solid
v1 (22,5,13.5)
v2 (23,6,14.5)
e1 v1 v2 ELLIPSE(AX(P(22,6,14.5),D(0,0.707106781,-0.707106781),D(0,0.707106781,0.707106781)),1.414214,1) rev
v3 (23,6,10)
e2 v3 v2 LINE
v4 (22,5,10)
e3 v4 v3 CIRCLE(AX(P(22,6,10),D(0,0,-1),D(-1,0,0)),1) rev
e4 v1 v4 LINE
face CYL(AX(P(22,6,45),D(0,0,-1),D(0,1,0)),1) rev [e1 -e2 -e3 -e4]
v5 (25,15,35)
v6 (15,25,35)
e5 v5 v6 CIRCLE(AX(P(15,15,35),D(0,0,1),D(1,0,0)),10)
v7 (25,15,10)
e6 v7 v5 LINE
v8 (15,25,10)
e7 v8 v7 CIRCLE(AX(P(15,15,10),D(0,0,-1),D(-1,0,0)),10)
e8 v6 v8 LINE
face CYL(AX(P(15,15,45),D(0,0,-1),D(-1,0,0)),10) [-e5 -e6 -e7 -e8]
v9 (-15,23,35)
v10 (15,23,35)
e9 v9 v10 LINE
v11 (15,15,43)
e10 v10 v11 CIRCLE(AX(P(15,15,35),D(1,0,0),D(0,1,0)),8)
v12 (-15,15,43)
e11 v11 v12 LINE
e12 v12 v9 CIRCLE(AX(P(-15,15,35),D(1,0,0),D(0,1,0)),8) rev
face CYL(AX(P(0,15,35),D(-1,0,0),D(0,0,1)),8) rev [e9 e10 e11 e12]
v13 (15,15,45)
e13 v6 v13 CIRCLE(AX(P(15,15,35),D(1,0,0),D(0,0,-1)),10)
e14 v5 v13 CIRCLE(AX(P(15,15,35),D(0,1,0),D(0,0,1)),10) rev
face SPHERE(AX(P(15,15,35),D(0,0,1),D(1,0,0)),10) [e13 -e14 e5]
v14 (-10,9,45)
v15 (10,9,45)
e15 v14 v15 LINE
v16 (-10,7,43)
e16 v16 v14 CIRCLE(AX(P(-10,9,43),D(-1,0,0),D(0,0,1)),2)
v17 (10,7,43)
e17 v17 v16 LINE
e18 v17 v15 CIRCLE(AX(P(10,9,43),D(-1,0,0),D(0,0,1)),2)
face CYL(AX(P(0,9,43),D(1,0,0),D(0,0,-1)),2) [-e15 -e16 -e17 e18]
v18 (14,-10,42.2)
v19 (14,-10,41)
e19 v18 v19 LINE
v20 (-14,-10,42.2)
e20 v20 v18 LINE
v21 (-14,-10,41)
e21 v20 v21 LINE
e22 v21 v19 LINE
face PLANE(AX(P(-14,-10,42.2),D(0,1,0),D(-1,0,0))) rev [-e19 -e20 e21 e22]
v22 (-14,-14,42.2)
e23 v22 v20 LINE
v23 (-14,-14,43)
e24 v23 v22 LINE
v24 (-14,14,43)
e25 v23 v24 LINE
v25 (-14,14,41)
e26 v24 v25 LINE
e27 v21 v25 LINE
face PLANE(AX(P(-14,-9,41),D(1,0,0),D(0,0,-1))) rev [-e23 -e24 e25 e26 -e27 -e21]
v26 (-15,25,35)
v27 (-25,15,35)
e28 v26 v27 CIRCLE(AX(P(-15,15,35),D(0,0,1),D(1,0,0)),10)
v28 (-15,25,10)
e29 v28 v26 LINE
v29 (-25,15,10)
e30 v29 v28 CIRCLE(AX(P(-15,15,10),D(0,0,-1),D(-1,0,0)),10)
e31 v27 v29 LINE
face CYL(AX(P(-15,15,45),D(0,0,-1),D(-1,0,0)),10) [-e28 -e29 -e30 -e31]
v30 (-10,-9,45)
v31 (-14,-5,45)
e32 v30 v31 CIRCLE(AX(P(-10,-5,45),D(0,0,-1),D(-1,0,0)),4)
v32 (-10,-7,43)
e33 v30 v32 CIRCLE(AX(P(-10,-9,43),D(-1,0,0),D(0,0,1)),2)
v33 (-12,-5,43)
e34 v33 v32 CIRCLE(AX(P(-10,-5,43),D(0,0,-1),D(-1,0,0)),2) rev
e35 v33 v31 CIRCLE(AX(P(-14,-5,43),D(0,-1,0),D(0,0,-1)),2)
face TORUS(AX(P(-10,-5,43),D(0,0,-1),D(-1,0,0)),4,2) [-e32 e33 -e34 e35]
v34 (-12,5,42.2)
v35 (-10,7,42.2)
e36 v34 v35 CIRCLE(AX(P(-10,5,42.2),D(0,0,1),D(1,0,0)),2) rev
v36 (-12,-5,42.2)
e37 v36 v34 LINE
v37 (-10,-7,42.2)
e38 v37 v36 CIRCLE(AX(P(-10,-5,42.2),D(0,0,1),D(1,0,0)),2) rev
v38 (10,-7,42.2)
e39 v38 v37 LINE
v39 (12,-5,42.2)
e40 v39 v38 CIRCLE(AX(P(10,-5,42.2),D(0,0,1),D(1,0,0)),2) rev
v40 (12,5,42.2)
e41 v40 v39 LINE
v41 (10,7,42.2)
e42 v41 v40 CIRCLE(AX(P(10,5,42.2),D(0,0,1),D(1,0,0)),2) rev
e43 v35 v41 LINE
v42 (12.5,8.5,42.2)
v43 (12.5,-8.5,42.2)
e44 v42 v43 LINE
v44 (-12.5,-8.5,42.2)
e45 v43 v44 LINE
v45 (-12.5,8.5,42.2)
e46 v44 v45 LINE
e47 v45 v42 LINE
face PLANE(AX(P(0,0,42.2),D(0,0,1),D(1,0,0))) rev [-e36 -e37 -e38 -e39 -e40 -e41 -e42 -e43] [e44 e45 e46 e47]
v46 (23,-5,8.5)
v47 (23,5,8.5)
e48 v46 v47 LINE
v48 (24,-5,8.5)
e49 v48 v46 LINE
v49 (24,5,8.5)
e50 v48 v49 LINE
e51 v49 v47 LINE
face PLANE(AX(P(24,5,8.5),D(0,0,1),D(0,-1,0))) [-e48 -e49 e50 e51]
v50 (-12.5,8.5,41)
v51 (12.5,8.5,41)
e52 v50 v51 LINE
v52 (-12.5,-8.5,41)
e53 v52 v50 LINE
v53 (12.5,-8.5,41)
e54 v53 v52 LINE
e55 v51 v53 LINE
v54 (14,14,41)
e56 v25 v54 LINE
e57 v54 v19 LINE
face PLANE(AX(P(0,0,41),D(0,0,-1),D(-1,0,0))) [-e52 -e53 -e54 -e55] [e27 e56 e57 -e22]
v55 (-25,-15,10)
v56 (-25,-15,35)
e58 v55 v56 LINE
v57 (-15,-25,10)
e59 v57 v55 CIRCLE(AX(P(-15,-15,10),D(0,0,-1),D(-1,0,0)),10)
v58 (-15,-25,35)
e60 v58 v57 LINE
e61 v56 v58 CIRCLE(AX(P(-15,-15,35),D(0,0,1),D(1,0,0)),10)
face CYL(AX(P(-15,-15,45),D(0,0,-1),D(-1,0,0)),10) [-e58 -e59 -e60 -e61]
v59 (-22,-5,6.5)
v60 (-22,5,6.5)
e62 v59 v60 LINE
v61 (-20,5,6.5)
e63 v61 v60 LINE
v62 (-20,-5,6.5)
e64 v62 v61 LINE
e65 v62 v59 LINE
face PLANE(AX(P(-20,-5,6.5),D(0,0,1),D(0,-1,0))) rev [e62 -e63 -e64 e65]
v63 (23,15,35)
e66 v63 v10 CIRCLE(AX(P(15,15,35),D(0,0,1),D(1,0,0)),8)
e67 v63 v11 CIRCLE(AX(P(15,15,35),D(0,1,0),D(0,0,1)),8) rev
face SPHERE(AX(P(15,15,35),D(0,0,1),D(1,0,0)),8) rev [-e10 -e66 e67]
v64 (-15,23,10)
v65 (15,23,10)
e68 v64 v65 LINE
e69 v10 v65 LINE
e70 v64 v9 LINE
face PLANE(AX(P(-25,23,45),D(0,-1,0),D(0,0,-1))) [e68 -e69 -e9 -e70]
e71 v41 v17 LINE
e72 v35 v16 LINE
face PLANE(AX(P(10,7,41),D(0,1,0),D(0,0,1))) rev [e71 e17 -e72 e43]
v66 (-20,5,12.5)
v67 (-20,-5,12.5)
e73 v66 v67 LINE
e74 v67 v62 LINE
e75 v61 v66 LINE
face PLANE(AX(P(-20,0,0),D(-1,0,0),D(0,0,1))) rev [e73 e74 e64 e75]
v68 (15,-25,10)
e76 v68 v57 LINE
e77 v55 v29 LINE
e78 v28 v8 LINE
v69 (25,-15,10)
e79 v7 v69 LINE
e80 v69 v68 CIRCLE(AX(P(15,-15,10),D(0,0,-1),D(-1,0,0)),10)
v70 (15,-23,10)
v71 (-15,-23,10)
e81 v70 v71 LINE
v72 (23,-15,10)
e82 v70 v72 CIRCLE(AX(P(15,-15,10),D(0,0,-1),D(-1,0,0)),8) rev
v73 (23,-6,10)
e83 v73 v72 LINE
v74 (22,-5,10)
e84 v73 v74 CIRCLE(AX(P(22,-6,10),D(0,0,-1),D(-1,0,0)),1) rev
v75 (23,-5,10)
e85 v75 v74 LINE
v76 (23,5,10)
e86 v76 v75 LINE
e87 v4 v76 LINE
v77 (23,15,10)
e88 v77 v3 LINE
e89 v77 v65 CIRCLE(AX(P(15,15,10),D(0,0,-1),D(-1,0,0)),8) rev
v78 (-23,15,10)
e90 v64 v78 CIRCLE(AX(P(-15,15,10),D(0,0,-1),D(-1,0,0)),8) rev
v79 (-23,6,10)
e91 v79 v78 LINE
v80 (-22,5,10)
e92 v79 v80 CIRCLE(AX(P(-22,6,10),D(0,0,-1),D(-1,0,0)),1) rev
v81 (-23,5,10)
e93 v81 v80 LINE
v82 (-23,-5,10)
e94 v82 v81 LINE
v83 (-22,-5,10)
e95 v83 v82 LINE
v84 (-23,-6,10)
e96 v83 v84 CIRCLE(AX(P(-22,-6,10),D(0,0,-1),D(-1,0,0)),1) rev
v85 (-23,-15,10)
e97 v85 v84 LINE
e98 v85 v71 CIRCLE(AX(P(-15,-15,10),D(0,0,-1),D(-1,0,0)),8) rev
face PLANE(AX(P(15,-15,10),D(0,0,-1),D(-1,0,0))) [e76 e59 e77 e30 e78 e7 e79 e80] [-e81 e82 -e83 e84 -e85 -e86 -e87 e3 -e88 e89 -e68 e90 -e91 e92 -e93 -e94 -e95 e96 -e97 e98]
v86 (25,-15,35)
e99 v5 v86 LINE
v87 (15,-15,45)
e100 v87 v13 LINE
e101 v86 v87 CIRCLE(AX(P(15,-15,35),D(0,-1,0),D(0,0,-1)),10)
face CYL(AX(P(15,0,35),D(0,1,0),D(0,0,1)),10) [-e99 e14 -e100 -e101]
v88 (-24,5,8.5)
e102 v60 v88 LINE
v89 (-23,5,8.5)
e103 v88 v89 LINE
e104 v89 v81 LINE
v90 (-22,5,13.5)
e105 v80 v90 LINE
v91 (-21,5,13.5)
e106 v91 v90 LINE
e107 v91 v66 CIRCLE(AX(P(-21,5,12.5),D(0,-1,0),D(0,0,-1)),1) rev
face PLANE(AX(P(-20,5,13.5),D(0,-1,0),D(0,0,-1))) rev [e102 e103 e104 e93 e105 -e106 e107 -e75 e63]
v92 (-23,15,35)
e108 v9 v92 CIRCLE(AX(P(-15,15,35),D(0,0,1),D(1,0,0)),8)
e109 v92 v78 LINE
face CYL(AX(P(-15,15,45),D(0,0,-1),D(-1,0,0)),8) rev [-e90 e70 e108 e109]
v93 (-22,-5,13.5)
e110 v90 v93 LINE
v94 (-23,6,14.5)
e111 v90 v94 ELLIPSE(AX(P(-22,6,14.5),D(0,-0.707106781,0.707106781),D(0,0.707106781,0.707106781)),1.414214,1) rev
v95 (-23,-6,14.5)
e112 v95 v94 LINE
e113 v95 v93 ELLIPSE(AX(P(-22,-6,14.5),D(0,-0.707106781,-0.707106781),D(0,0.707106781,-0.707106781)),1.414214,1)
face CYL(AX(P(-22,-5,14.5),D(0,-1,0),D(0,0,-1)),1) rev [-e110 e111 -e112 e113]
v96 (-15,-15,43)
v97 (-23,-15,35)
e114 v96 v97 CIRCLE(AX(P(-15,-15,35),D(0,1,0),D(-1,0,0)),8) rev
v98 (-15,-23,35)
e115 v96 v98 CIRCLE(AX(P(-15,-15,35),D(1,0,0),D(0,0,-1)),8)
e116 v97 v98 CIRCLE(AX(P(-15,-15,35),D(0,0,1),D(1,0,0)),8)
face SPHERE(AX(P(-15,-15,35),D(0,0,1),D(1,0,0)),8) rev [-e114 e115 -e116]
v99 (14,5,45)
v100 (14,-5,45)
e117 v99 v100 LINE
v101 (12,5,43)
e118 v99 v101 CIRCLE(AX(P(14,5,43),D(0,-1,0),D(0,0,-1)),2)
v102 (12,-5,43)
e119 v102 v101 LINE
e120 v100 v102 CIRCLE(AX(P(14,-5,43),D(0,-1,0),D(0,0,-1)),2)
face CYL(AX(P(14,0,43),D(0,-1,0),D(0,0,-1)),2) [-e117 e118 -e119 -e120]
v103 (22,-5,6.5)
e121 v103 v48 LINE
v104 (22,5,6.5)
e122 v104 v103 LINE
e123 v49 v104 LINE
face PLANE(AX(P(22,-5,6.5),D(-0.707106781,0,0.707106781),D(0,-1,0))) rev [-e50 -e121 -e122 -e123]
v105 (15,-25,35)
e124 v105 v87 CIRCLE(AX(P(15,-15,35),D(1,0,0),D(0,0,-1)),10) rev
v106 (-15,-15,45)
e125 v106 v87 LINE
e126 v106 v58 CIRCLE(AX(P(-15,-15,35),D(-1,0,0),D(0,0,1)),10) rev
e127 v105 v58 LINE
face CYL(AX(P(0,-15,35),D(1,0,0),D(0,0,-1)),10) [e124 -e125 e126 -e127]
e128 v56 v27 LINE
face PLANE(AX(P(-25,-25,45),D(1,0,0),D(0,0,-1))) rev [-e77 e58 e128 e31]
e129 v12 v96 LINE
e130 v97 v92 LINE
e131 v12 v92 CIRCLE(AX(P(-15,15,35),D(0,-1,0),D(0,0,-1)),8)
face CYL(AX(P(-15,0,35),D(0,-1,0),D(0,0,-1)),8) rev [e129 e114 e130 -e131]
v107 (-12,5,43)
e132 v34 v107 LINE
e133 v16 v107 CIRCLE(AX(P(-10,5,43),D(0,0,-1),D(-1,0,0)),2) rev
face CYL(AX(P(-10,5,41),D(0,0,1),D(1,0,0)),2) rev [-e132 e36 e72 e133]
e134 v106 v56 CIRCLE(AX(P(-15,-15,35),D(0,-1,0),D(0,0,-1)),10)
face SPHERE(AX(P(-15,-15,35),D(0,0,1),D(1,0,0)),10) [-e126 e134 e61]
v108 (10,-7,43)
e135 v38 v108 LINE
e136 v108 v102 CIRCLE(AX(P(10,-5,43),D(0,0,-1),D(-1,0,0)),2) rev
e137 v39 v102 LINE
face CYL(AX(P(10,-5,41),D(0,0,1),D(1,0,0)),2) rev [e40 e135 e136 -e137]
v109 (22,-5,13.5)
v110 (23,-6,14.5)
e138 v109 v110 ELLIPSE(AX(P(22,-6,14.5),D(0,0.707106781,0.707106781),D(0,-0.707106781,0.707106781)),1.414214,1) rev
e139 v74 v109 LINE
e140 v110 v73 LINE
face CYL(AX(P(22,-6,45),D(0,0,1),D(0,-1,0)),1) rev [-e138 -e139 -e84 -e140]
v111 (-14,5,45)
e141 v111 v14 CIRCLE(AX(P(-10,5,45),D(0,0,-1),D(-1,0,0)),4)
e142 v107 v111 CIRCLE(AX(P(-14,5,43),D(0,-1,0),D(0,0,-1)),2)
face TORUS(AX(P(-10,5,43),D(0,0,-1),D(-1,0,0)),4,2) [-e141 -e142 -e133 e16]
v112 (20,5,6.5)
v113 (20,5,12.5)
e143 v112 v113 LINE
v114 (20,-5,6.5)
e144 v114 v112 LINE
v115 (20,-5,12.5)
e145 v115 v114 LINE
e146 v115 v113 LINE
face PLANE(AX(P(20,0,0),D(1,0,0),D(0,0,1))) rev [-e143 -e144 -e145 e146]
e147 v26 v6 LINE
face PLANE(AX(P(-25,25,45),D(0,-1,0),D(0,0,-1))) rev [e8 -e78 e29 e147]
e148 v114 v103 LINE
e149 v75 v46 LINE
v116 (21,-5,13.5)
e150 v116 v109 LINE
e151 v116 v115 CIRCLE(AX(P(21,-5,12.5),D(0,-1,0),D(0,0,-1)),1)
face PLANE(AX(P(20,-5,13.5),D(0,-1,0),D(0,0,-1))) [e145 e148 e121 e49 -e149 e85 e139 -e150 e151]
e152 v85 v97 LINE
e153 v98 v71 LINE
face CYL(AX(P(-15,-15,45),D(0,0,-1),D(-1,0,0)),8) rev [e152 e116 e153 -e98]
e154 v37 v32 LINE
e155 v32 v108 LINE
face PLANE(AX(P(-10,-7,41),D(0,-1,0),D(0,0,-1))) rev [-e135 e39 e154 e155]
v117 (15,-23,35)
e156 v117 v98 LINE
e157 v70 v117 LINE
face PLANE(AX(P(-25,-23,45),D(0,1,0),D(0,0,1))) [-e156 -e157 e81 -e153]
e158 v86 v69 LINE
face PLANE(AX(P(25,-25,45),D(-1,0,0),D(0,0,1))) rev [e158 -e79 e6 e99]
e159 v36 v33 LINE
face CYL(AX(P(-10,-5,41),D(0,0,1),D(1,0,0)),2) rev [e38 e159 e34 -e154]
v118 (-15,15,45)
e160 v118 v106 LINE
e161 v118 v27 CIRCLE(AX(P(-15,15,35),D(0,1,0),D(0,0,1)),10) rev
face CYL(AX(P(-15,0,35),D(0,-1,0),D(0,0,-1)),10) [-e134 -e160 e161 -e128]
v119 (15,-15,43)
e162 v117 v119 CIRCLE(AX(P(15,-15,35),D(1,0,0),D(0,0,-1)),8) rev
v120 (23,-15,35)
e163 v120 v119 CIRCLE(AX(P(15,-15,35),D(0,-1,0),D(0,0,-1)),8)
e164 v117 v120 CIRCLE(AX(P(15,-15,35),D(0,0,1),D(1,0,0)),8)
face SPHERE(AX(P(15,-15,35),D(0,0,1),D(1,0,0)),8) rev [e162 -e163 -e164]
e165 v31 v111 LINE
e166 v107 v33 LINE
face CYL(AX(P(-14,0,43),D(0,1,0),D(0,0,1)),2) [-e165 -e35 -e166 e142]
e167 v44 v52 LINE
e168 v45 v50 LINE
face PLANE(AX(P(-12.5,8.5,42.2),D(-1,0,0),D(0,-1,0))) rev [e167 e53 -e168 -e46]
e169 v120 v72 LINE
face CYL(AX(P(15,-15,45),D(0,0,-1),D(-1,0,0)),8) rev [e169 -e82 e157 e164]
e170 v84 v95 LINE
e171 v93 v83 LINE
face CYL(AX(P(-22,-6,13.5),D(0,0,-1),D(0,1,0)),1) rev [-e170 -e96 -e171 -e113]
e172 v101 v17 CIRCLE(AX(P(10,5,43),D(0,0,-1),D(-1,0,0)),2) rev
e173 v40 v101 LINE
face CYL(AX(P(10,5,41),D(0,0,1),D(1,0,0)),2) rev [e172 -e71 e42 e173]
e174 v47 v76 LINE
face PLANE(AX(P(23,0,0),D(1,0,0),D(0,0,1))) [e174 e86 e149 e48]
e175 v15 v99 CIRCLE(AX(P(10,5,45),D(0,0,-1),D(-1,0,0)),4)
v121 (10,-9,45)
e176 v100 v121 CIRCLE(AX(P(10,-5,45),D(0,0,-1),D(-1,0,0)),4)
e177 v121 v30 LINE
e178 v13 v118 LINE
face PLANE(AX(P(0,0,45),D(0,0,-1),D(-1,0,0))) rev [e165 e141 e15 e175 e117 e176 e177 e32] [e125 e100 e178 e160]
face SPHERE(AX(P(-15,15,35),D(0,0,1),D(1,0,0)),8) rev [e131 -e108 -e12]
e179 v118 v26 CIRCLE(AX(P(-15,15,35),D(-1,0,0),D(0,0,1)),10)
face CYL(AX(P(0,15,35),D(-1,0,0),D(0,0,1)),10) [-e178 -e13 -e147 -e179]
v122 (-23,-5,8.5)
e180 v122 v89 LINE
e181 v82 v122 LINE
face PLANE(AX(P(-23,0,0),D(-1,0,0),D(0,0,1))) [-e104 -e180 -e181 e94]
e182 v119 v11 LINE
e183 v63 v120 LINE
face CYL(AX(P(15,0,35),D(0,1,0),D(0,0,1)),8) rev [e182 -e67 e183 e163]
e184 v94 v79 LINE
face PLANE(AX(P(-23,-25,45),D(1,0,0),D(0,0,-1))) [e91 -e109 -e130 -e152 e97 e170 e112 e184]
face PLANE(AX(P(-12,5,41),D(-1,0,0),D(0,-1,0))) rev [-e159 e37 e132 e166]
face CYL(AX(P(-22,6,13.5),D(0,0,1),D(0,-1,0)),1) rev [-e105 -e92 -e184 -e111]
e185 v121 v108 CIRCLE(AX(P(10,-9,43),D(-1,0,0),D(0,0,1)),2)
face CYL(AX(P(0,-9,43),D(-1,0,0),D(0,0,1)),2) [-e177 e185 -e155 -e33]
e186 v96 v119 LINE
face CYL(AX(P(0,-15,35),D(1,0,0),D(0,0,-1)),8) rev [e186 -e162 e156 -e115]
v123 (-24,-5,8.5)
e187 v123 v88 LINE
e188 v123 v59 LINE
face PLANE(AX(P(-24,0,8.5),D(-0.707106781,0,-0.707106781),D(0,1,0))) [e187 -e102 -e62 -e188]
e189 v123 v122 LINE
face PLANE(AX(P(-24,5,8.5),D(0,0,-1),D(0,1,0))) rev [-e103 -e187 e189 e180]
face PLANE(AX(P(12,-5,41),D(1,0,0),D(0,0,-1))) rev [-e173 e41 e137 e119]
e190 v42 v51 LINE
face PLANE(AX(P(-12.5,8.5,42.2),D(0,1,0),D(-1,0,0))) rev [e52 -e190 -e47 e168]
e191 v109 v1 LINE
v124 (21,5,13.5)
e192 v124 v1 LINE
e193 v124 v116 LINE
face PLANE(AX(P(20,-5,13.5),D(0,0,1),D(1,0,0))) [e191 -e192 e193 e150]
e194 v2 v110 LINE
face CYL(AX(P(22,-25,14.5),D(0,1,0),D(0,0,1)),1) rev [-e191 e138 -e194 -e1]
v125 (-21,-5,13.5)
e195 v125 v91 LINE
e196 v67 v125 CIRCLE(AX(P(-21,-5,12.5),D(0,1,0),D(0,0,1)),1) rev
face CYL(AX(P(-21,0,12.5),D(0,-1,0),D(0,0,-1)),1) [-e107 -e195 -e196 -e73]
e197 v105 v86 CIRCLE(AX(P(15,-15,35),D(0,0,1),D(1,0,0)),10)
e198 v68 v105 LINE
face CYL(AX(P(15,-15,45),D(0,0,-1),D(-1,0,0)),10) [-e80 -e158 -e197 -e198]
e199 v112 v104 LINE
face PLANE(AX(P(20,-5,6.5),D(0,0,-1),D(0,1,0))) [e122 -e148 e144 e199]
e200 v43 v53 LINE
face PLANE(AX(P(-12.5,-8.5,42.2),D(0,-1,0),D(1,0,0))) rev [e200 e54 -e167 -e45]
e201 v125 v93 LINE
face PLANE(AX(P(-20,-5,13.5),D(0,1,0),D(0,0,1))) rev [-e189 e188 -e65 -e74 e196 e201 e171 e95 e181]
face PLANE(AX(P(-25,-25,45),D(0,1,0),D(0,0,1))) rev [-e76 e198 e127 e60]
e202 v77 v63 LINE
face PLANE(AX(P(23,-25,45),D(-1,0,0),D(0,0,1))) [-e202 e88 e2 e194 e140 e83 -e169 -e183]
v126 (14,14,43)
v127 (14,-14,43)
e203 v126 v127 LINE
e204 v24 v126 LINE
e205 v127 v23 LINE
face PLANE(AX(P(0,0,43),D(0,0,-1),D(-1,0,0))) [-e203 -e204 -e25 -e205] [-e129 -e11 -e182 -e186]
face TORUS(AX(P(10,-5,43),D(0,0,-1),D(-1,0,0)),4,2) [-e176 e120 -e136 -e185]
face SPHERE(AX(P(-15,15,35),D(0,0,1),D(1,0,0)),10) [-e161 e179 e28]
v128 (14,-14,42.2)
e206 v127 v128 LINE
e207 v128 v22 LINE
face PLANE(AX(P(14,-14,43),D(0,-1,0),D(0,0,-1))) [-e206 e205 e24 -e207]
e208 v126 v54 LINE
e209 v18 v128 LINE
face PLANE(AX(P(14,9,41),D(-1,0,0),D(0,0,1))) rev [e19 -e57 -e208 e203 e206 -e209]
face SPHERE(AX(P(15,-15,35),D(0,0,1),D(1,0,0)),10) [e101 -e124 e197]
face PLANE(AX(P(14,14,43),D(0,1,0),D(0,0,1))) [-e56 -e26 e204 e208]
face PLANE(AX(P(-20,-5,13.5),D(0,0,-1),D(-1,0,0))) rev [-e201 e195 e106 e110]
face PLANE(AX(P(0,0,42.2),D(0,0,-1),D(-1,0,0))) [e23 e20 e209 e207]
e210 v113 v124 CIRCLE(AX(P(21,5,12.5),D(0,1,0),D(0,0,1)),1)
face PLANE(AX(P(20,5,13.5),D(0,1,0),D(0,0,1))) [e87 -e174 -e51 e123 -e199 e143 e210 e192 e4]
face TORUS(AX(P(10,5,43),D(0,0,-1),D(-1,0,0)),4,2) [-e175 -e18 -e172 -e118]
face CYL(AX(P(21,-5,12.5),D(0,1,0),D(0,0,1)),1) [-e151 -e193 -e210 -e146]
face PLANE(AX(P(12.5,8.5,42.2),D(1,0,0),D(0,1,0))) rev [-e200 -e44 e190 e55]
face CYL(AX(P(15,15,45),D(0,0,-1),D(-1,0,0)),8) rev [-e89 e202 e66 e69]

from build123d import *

# Parameters (mm, degrees)
SKETCH1_W                = 50
SKETCH1_H                = 50
BOSS_EXTRUDE1_DEPTH      = 45
FILLET1_R                = 10
SHELL1_T                 = -2
SKETCH2_W                = 24
SKETCH2_H                = 14
CUT_EXTRUDE1_DEPTH       = 10
SKETCH3_W                = 28
SKETCH3_H                = 18
BOSS_EXTRUDE2_DEPTH      = 2
SKETCH4_W                = 24
SKETCH4_H                = 14
CUT_EXTRUDE2_DEPTH       = 2
FILLET2_R                = 2
FILLET3_R                = 2
SKETCH5_W                = 28
SKETCH5_H                = 28
BOSS_EXTRUDE3_DEPTH      = 2
CUT_EXTRUDE4_DEPTH       = 2
SKETCH8_W                = 25
SKETCH8_H                = 17
CUT_EXTRUDE5_DEPTH       = 1.2
SKETCH9_W                = 28
SKETCH9_H                = 4
CUT_EXTRUDE6_DEPTH       = 1.2
CUT_EXTRUDE10_START      = -10
CUT_EXTRUDE10_DEPTH      = 10
SKETCH14_W               = 7
SKETCH14_H               = 10
BOSS_EXTRUDE4_DEPTH      = 3
SKETCH15_W               = 2
SKETCH15_H               = 10
BOSS_EXTRUDE5_DEPTH      = 1
CHAMFER1_SIZE            = 2
FILLET4_R                = 1
CHAMFER1_OF_MIRROR1_SIZE = 2
FILLET5_R                = 1


with BuildPart() as part:
    # Sketch1 → Boss-Extrude1 (new body)
    with BuildSketch(Plane.XY):
        Rectangle(SKETCH1_W, SKETCH1_H)
    extrude(amount=BOSS_EXTRUDE1_DEPTH)

    # Fillet1
    fillet1_edges = [part.edges().sort_by_distance(p)[0] for p in [
        (-25, 0, 45),
        (0, -25, 45),
        (25, 0, 45),
        (25, -25, 22.5),
        (-25, -25, 22.5),
        (-25, 25, 22.5),
        (25, 25, 22.5),
        (0, 25, 45),
    ]]
    fillet(fillet1_edges, radius=FILLET1_R)

    # Shell1
    shell1_openings = [part.faces().sort_by_distance(p)[0] for p in [
        (0, 0, 0),
    ]]
    offset(amount=SHELL1_T, openings=shell1_openings, kind=Kind.INTERSECTION)

    # Sketch2 → Cut-Extrude1 (cut)
    with BuildSketch(Plane(origin=(0, 0, 43), x_dir=(-1, 0, 0), z_dir=(0, 0, -1))):
        Rectangle(SKETCH2_W, SKETCH2_H)
    extrude(amount=-CUT_EXTRUDE1_DEPTH, mode=Mode.SUBTRACT)

    # Sketch3 → Boss-Extrude2 (add)
    with BuildSketch(Plane(origin=(0, 0, 43), x_dir=(-1, 0, 0), z_dir=(0, 0, -1))):
        Rectangle(SKETCH3_W, SKETCH3_H)
    extrude(amount=BOSS_EXTRUDE2_DEPTH)

    # Sketch4 → Cut-Extrude2 (cut)
    with BuildSketch(Plane.XY.offset(43)):
        Rectangle(SKETCH4_W, SKETCH4_H)
    extrude(amount=-CUT_EXTRUDE2_DEPTH, mode=Mode.SUBTRACT)

    # Fillet2
    fillet2_edges = [part.edges().sort_by_distance(p)[0] for p in [
        (-12, 7, 43),
        (-12, -7, 43),
        (12, -7, 43),
        (12, 7, 43),
    ]]
    fillet(fillet2_edges, radius=FILLET2_R)

    # Fillet3
    fillet3_edges = [part.edges().sort_by_distance(p)[0] for p in [
        (12, 0, 45),
        (0, 7, 45),
        (0, -7, 45),
        (-12, 0, 45),
        (11.414213562, 6.414213562, 45),
        (11.414213562, -6.414213562, 45),
        (-11.414213562, -6.414213562, 45),
        (-11.414213562, 6.414213562, 45),
    ]]
    fillet(fillet3_edges, radius=FILLET3_R)

    # Sketch5 → Boss-Extrude3 (add)
    with BuildSketch(Plane(origin=(0, 0, 41), x_dir=(-1, 0, 0), z_dir=(0, 0, -1))):
        Rectangle(SKETCH5_W, SKETCH5_H)
    extrude(amount=-BOSS_EXTRUDE3_DEPTH)

    # Sketch7 → Cut-Extrude4 (cut)
    with BuildSketch(Plane.XY.offset(43)):
        with BuildLine():
            Line((12, -5), (12, 5))
            ThreePointArc((12, 5), (11.414213562, 6.414213562), (10, 7))
            Line((10, 7), (-10, 7))
            ThreePointArc((-10, 7), (-11.414213562, 6.414213562), (-12, 5))
            Line((-12, 5), (-12, -5))
            ThreePointArc((-12, -5), (-11.414213562, -6.414213562), (-10, -7))
            Line((-10, -7), (10, -7))
            ThreePointArc((10, -7), (11.414213562, -6.414213562), (12, -5))
        make_face()
    extrude(amount=-CUT_EXTRUDE4_DEPTH, mode=Mode.SUBTRACT)

    # Sketch8 → Cut-Extrude5 (cut)
    with BuildSketch(Plane(origin=(0, 0, 41), x_dir=(-1, 0, 0), z_dir=(0, 0, -1))):
        Rectangle(SKETCH8_W, SKETCH8_H)
    extrude(amount=-CUT_EXTRUDE5_DEPTH, mode=Mode.SUBTRACT)

    # Sketch9 → Cut-Extrude6 (cut)
    with BuildSketch(Plane(origin=(0, 0, 41), x_dir=(-1, 0, 0), z_dir=(0, 0, -1))):
        with Locations((0, -12)):
            Rectangle(SKETCH9_W, SKETCH9_H)
    extrude(amount=-CUT_EXTRUDE6_DEPTH, mode=Mode.SUBTRACT)

    # Sketch13 → Cut-Extrude10 (cut)
    with BuildSketch(Plane(origin=(0, 0, 0), x_dir=(-1, 0, 0), z_dir=(0, 0, -1)).offset(CUT_EXTRUDE10_START)):
        with BuildLine():
            Line((-15, -25), (15, -25))
            ThreePointArc((15, -25), (22.071067812, -22.071067812), (25, -15))
            Line((25, -15), (25, 15))
            ThreePointArc((25, 15), (22.071067812, 22.071067812), (15, 25))
            Line((15, 25), (-15, 25))
            ThreePointArc((-15, 25), (-22.071067812, 22.071067812), (-25, 15))
            Line((-25, 15), (-25, -15))
            ThreePointArc((-25, -15), (-22.071067812, -22.071067812), (-15, -25))
        make_face()
    extrude(amount=CUT_EXTRUDE10_DEPTH, mode=Mode.SUBTRACT)

    # Sketch14 → Boss-Extrude4 (add)
    with BuildSketch(Plane(origin=(-23, 0, 0), x_dir=(0, 0, -1), z_dir=(1, 0, 0))):
        with Locations((-10, 0)):
            Rectangle(SKETCH14_W, SKETCH14_H)
    boss_extrude4 = extrude(amount=BOSS_EXTRUDE4_DEPTH)

    # Sketch15 → Boss-Extrude5 (add)
    with BuildSketch(Plane.ZY.offset(23)):
        with Locations((7.5, 0)):
            Rectangle(SKETCH15_W, SKETCH15_H)
    boss_extrude5 = extrude(amount=BOSS_EXTRUDE5_DEPTH)

    # Chamfer1
    chamfer1_edges = [part.edges().sort_by_distance(p)[0] for p in [
        (-24, 0, 6.5),
    ]]
    chamfer(chamfer1_edges, length=CHAMFER1_SIZE - 0.0001)  # a hair under: the kernel refuses the full size

    # Fillet4
    fillet4_edges = [part.edges().sort_by_distance(p)[0] for p in [
        (-23, 5, 11.75),
        (-23, 0, 13.5),
        (-23, -5, 11.75),
        (-20, 0, 13.5),
    ]]
    fillet(fillet4_edges, radius=FILLET4_R)

    # Mirror1: Boss-Extrude4, Boss-Extrude5 across plane
    add(boss_extrude4.mirror(Plane(origin=(0, 0, 0), x_dir=(0, 0, 1), z_dir=(1, 0, 0))))
    add(boss_extrude5.mirror(Plane(origin=(0, 0, 0), x_dir=(0, 0, 1), z_dir=(1, 0, 0))))

    # Chamfer1 of Mirror1
    chamfer1_of_mirror1_edges = [part.edges().sort_by_distance(p)[0] for p in [
        (24, 0, 6.5),
    ]]
    chamfer(chamfer1_of_mirror1_edges, length=CHAMFER1_OF_MIRROR1_SIZE - 0.0001)  # a hair under: the kernel refuses the full size

    # Fillet5
    fillet5_edges = [part.edges().sort_by_distance(p)[0] for p in [
        (23, 5, 11.75),
        (23, 0, 13.5),
        (23, -5, 11.75),
        (20, 0, 13.5),
    ]]
    fillet(fillet5_edges, radius=FILLET5_R)


solid = part.part
